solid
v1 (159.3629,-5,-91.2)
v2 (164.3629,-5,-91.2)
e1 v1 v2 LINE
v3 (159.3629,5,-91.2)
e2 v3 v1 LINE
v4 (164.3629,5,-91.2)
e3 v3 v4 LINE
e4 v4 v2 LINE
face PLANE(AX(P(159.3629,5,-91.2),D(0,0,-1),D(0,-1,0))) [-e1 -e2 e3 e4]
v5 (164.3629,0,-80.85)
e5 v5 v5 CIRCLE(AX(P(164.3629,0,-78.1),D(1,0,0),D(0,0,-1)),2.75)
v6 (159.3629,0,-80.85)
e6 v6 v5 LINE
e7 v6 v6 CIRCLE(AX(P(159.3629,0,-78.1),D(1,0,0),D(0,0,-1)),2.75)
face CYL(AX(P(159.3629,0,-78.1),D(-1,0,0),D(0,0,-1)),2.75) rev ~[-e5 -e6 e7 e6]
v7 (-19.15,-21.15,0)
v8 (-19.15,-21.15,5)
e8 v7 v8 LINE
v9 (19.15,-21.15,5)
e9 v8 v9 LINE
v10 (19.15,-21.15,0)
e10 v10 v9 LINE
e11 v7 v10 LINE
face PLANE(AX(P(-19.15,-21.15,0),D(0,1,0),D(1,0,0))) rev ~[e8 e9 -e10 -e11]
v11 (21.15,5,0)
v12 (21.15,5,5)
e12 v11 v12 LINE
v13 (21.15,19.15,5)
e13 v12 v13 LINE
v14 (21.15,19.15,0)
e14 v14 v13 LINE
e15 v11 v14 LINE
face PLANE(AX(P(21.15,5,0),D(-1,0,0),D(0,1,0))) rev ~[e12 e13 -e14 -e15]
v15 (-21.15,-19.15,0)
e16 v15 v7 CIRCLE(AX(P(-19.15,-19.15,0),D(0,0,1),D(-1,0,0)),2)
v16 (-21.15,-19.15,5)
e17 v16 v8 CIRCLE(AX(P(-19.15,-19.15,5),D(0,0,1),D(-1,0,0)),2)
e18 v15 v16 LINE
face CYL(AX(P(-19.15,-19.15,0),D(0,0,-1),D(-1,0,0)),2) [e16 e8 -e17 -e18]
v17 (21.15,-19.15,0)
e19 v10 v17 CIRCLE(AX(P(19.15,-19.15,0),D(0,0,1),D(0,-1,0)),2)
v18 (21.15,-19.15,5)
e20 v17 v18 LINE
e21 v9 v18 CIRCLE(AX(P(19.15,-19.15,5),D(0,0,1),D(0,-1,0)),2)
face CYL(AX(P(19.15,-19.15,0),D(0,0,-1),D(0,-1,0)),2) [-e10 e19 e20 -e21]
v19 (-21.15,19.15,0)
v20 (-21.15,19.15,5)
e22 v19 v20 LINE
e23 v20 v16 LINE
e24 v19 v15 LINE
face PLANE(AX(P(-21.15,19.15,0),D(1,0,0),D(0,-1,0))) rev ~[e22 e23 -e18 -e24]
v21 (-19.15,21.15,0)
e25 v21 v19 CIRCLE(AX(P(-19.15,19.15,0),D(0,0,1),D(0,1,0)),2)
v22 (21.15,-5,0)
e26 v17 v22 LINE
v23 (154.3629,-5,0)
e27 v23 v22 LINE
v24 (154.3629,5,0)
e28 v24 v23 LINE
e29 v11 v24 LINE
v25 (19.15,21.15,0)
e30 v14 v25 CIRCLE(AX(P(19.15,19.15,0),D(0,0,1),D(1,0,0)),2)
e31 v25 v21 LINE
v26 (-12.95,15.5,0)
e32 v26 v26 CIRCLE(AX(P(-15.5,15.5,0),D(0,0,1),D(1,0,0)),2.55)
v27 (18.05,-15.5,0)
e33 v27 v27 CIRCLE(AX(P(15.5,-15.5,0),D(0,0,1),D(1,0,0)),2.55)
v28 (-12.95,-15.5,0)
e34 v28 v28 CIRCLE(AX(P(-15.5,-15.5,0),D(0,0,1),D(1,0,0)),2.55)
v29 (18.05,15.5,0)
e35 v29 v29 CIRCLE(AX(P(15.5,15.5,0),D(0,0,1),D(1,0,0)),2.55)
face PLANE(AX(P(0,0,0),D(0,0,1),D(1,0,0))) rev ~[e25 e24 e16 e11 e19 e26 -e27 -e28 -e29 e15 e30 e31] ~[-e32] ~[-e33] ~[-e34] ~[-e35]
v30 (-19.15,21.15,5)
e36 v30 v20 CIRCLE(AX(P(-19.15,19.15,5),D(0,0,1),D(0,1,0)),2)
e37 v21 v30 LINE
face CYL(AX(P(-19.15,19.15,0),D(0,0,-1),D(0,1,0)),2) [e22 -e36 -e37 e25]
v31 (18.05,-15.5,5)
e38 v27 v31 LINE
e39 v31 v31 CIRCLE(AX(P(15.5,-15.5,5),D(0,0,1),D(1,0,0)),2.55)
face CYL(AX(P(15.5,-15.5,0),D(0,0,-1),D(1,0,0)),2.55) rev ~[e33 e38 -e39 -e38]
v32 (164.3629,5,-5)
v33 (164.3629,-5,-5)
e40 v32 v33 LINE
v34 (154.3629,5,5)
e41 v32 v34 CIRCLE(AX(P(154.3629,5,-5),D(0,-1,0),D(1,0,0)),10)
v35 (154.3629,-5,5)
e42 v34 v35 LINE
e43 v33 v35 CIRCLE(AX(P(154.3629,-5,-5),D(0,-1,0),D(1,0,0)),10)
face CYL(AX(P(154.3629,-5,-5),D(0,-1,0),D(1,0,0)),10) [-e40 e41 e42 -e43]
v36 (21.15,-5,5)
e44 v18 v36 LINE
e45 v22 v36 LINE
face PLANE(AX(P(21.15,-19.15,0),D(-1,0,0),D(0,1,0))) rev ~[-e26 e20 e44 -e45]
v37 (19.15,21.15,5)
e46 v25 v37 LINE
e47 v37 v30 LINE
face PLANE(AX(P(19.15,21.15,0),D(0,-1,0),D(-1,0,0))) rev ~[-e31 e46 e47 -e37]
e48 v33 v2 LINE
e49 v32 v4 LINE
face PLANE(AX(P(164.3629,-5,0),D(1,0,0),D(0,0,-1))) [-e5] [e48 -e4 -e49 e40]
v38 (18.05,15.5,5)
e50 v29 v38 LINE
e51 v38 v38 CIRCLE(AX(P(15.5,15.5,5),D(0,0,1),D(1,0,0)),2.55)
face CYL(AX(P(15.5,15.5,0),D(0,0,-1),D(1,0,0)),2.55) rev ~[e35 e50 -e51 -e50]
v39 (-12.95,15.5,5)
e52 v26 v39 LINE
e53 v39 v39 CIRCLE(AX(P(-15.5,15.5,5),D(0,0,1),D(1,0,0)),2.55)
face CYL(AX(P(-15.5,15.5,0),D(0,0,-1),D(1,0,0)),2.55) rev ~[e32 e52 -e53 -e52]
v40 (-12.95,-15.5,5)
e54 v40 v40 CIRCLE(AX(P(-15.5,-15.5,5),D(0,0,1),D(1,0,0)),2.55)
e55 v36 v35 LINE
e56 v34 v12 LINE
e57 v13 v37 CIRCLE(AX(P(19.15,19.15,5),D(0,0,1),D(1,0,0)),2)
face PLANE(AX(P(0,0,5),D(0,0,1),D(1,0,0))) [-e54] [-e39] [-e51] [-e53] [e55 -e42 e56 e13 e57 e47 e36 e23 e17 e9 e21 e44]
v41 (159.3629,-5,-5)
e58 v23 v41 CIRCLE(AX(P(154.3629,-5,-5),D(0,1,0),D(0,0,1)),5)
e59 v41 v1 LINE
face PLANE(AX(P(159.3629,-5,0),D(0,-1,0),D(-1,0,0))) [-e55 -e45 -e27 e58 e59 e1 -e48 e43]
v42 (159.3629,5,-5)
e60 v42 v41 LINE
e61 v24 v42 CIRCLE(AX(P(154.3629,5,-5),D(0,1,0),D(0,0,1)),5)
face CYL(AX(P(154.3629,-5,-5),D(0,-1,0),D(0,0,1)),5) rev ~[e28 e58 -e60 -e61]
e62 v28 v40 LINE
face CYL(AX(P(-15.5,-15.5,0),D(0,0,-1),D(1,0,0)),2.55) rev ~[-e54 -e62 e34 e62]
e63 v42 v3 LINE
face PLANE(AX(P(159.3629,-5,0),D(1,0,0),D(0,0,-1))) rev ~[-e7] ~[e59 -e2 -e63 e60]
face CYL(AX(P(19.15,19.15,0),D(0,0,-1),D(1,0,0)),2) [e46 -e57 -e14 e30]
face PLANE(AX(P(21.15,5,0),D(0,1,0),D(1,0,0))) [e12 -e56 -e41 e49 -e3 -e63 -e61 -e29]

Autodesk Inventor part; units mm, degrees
ref_plane "YZ Plane" through (0, 0, 0) normal (1, 0, 0) x (0, 1, 0)
ref_plane "XZ Plane" through (0, 0, 0) normal (0, 1, 0) x (-1, 0, 0)
ref_plane "XY Plane" through (0, 0, 0) normal (0, 0, 1) x (1, 0, 0)
sketch "Sketch1" plane through (0, 0, 0) normal (0, 0, 1) x (1, 0, 0)
  line L0 (-21.15, 19.15) -> (-21.15, -19.15)
  line L1 (21.15, -19.15) -> (21.15, 19.15)
  line L2 (19.15, 21.15) -> (-19.15, 21.15)
  line L3 (-19.15, -21.15) -> (19.15, -21.15)
  circle A0 centre (15.5, -15.5) radius 2.55
  circle A1 centre (15.5, 15.5) radius 2.55
  circle A2 centre (-15.5, 15.5) radius 2.55
  circle A3 centre (-15.5, -15.5) radius 2.55
  line L4 (-21.15, -19.15) -> (-21.15, 19.15)
  line L5 (-19.15, 21.15) -> (19.15, 21.15)
  line L6 (21.15, 19.15) -> (21.15, -19.15)
  line L7 (19.15, -21.15) -> (-19.15, -21.15)
  arc A4 (-21.15, -19.15) -> (-19.15, -21.15) centre (-19.15, -19.15) ccw
  arc A5 (-19.15, 21.15) -> (-21.15, 19.15) centre (-19.15, 19.15) ccw
  arc A6 (21.15, 19.15) -> (19.15, 21.15) centre (19.15, 19.15) ccw
  arc A7 (19.15, -21.15) -> (21.15, -19.15) centre (19.15, -19.15) ccw
  circle A8 centre (15.5, -15.5) radius 2.55
  circle A9 centre (15.5, 15.5) radius 2.55
  circle A10 centre (-15.5, 15.5) radius 2.55
  circle A11 centre (-15.5, -15.5) radius 2.55
  line L8 (159.3629, 5) -> (159.3629, -5)
  line L9 (138.2729, 5) -> (159.3629, 5)
  line L10 (159.3629, -5) -> (138.2729, -5)
  line L11 (21.15, -5) -> (159.3629, -5)
  line L12 (21.15, 5) -> (159.3629, 5)
  line L13 (159.3629, -5) -> (159.3629, 5)
  point P0 (0, 0)
  dimension "d0" = 2
  dimension "d1" = 10
  dimension "d2" = 5
sketch "Sketch2" plane through (159.3629, -5, 0) normal (1, 0, 0) x (0, 0, -1)
  line L0 (91.2, 10) -> (91.2, 0)
  line L1 (0, 10) -> (-5, 10)
  line L2 (-5, 10) -> (-5, 0)
  line L3 (0, 0) -> (-5, 0)
  line L4 (0, 10) -> (-5, 10)
  line L5 (-5, 10) -> (91.2, 10)
  line L6 (0, 0) -> (-5, 0)
  line L7 (-5, 0) -> (91.2, 0)
  line L8 (-5, 24.15) -> (-5, 10)
  line L9 (-5, 10) -> (-5, 0)
  line L10 (91.2, 10) -> (91.2, 0)
  circle A0 centre (78.1, 5) radius 2.75
  point P0 (0, 5)
  point P1 (78.1, 7.0932)
  point P2 (91.2, 5)
  dimension "d4" = 5.5
extrude "Plate1" add sketch "Sketch1" along normal blind 5
sheet face with bend "Face2" sketch "Sketch2" thickness 5 toward (1, 0, 0) bend radius 5
bend "Bend1"
equation "\"d3\" = Thickness"
equation "\"d5\" = BendRadius"
equation "\"d6\" = BendReliefWidth"
equation "\"d8\" = MinimumRemnant"
equation "\"d7\" = BendReliefDepth"
equation "\"d9\" = TransitionRadius"
equation "\"BendRadius\" = Thickness"
equation "\"BendReliefWidth\" = Thickness"
equation "\"BendReliefDepth\" = 0.5 * Thickness"
equation "\"TransitionRadius\" = BendRadius"
equation "\"JacobiRadiusSize\" = BendRadius"
equation "\"GapSize\" = Thickness"
equation "\"Thickness\" = 5"
equation "\"MinimumRemnant\" = 10"
properties part number "detenedor"
